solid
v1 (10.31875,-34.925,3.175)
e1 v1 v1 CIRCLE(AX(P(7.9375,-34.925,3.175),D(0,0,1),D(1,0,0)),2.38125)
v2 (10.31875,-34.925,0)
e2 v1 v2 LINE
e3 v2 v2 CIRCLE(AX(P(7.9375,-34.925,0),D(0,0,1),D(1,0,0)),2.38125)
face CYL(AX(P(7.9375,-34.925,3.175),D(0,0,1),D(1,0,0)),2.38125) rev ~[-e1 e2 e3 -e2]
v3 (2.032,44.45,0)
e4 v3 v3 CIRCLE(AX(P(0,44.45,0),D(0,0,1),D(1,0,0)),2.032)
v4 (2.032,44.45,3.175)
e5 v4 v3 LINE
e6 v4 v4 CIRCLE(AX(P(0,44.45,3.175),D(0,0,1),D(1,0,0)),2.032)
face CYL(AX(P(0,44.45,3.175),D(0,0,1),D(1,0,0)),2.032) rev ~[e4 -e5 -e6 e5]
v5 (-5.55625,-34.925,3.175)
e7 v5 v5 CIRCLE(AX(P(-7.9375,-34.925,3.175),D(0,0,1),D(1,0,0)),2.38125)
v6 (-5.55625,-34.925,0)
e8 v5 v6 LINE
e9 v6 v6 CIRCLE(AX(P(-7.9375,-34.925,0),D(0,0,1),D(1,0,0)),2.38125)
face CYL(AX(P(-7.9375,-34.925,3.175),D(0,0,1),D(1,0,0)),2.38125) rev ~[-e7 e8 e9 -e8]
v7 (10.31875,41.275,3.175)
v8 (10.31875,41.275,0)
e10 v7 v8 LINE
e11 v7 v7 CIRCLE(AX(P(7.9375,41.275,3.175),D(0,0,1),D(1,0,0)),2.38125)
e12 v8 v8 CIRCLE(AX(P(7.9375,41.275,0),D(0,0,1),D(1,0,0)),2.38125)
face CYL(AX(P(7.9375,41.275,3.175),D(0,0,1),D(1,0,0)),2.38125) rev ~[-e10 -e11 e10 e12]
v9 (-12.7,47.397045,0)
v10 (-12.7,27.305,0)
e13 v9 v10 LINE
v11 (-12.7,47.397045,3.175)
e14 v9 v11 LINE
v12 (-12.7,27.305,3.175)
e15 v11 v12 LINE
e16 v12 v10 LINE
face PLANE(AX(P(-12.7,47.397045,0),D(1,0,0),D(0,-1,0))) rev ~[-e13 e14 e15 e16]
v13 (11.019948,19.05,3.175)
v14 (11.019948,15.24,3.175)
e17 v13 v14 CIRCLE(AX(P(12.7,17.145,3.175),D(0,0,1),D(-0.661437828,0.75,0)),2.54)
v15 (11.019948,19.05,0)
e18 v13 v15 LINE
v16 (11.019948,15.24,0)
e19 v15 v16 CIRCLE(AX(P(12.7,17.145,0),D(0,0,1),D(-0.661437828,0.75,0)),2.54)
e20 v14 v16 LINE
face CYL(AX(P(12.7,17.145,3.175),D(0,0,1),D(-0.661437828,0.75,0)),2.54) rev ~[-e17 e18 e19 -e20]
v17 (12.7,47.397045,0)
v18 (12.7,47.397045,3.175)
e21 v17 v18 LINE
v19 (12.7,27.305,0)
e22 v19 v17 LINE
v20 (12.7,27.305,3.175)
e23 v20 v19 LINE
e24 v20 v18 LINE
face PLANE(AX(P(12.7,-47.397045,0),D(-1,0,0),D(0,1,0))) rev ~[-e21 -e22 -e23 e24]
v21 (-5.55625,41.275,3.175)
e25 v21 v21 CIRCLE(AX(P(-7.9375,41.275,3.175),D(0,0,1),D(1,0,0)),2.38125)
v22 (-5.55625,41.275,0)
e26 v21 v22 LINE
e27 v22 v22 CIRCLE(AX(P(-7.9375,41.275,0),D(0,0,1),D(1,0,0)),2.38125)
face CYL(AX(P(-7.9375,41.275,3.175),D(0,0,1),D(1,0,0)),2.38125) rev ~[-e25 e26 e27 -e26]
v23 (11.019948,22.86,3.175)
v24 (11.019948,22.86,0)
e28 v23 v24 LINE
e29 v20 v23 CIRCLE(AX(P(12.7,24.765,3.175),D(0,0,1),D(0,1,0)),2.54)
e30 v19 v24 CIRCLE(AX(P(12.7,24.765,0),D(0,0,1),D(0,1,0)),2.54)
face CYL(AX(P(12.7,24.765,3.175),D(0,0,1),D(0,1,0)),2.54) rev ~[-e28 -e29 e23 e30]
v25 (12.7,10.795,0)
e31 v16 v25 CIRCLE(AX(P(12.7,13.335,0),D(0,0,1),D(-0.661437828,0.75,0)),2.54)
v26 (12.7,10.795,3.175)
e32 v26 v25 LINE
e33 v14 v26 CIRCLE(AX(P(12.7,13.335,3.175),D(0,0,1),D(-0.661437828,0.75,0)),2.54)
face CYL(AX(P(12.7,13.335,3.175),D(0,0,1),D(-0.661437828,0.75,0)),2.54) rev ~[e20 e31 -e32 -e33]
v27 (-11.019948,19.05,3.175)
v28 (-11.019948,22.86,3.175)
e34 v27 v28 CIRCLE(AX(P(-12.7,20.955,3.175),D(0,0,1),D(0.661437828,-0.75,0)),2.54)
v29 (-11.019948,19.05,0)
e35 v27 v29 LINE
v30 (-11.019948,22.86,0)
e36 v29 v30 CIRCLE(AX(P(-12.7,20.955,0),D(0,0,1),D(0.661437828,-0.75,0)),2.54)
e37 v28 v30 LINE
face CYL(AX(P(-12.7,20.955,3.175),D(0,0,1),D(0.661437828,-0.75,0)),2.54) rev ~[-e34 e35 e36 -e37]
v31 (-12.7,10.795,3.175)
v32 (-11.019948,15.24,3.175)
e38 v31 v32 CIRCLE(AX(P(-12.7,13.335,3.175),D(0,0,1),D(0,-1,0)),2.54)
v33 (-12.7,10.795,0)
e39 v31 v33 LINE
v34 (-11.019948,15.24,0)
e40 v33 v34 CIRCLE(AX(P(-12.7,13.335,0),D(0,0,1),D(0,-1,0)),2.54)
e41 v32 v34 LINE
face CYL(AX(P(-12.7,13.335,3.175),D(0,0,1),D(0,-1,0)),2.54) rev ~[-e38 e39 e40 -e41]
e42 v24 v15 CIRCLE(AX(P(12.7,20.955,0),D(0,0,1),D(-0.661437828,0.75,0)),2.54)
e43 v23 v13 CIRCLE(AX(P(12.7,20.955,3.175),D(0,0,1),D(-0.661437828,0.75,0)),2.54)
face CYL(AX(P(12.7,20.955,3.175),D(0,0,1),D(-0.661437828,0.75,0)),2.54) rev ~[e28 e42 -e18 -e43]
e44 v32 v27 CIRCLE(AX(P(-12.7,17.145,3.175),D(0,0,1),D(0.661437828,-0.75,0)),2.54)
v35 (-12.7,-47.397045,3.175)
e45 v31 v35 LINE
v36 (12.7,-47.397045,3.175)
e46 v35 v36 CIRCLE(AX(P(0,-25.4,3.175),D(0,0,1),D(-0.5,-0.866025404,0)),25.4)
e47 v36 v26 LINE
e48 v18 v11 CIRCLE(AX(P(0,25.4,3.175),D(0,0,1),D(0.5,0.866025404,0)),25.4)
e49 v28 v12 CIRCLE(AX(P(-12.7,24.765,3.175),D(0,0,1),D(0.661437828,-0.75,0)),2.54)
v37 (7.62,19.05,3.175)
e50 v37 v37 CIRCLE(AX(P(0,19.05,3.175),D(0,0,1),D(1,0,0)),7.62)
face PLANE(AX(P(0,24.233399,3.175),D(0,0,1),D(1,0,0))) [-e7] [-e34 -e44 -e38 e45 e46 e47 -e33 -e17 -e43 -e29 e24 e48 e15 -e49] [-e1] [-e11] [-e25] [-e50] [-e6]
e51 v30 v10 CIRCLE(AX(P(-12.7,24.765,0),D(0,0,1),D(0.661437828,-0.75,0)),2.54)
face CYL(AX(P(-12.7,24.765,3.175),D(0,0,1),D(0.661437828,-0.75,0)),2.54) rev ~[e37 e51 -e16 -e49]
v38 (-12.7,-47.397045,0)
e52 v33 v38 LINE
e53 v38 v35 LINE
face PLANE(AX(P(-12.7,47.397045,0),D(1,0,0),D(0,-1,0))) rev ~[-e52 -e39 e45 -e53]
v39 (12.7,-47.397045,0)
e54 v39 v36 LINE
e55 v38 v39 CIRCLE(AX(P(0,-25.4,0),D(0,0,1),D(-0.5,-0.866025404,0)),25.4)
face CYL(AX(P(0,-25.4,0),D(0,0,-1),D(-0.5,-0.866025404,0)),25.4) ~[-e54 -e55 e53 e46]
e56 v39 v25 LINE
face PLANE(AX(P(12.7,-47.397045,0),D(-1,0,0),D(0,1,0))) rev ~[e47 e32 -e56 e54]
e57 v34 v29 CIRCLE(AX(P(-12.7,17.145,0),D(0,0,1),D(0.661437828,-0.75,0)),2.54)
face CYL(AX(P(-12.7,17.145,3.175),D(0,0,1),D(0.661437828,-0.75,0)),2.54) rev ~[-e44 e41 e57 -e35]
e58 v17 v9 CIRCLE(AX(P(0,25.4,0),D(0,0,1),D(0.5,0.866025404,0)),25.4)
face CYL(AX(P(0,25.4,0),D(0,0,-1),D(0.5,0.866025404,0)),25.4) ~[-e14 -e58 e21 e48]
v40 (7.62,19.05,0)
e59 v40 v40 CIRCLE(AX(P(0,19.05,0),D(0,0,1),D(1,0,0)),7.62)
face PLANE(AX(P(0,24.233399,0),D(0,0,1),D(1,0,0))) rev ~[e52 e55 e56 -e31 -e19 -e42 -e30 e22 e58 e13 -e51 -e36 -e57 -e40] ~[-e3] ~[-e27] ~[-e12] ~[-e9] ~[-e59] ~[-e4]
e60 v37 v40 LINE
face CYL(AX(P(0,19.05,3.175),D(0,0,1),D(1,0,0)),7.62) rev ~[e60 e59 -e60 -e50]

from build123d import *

# Parameters (mm, degrees)
F1_DEPTH = 3.175
F2_R     = 2.38125
F3_DEPTH = 3.175
F4_R     = 7.62
F4_R_2   = 2.032
F5_DEPTH = 25.4


# Not quite as in the source:
# - a feature names something its author has since deleted; it is built from what else it names


with BuildPart() as f1:
    # F0 (on Top) → F1 (new body)
    with BuildSketch(Plane.XY):
        with BuildLine():
            Line((12.7, 0), (12.7, 47.3970452561))
            ThreePointArc((12.7, 47.3970452561), (0, 50.8), (-12.7, 47.3970452561))
            Line((-12.7, 47.3970452561), (-12.7, 0))
            Line((-12.7, 0), (0, 0))
            Line((0, 0), (12.7, 0))
        make_face()
        with BuildLine():
            Line((12.7, -47.3970452561), (12.7, 0))
            Line((12.7, 0), (0, 0))
            Line((0, 0), (-12.7, 0))
            Line((-12.7, 0), (-12.7, -47.3970452561))
            ThreePointArc((-12.7, -47.3970452561), (0, -50.8), (12.7, -47.3970452561))
        make_face()
    extrude(amount=F1_DEPTH)

    # F2 (on face) → F3 (cut, through all)
    with BuildSketch(Plane.XY.offset(3.175)):
        with Locations((-7.9375, 41.275)):
            Circle(F2_R)
        with Locations((7.9375, 41.275)):
            Circle(F2_R)
        with Locations((-7.9375, -34.925)):
            Circle(F2_R)
        with Locations((7.9375, -34.925)):
            Circle(F2_R)
    extrude(amount=-F3_DEPTH, mode=Mode.SUBTRACT)

    # F4 (on face) → F5 (cut)
    with BuildSketch(Plane.XY.offset(3.175)):
        with Locations((0, 19.05)):
            Circle(F4_R)
        with BuildLine():
            ThreePointArc((-11.0199479175, 19.05), (-10.16, 20.955), (-11.0199479175, 22.86))
            ThreePointArc((-11.0199479175, 22.86), (-10.3240475594, 25.6630256121), (-12.7, 27.305))
            Line((-12.7, 27.305), (-12.7, 23.495))
            Line((-12.7, 23.495), (-12.7, 22.225))
            Line((-12.7, 22.225), (-12.7, 19.685))
            Line((-12.7, 19.685), (-12.7, 18.415))
            Line((-12.7, 18.415), (-12.7, 15.875))
            Line((-12.7, 15.875), (-12.7, 14.605))
            Line((-12.7, 14.605), (-12.7, 10.795))
            ThreePointArc((-12.7, 10.795), (-10.3240475594, 12.4369743879), (-11.0199479175, 15.24))
            ThreePointArc((-11.0199479175, 15.24), (-10.16, 17.145), (-11.0199479175, 19.05))
        make_face()
        with BuildLine():
            Line((12.7, 10.795), (12.7, 27.305))
            ThreePointArc((12.7, 27.305), (10.3240475594, 25.6630256121), (11.0199479175, 22.86))
            ThreePointArc((11.0199479175, 22.86), (10.16, 20.955), (11.0199479175, 19.05))
            ThreePointArc((11.0199479175, 19.05), (10.16, 17.145), (11.0199479175, 15.24))
            ThreePointArc((11.0199479175, 15.24), (10.3240475594, 12.4369743879), (12.7, 10.795))
        make_face()
        with Locations((0, 44.45)):
            Circle(F4_R_2)
    extrude(amount=-F5_DEPTH, mode=Mode.SUBTRACT)


solid = f1.part
